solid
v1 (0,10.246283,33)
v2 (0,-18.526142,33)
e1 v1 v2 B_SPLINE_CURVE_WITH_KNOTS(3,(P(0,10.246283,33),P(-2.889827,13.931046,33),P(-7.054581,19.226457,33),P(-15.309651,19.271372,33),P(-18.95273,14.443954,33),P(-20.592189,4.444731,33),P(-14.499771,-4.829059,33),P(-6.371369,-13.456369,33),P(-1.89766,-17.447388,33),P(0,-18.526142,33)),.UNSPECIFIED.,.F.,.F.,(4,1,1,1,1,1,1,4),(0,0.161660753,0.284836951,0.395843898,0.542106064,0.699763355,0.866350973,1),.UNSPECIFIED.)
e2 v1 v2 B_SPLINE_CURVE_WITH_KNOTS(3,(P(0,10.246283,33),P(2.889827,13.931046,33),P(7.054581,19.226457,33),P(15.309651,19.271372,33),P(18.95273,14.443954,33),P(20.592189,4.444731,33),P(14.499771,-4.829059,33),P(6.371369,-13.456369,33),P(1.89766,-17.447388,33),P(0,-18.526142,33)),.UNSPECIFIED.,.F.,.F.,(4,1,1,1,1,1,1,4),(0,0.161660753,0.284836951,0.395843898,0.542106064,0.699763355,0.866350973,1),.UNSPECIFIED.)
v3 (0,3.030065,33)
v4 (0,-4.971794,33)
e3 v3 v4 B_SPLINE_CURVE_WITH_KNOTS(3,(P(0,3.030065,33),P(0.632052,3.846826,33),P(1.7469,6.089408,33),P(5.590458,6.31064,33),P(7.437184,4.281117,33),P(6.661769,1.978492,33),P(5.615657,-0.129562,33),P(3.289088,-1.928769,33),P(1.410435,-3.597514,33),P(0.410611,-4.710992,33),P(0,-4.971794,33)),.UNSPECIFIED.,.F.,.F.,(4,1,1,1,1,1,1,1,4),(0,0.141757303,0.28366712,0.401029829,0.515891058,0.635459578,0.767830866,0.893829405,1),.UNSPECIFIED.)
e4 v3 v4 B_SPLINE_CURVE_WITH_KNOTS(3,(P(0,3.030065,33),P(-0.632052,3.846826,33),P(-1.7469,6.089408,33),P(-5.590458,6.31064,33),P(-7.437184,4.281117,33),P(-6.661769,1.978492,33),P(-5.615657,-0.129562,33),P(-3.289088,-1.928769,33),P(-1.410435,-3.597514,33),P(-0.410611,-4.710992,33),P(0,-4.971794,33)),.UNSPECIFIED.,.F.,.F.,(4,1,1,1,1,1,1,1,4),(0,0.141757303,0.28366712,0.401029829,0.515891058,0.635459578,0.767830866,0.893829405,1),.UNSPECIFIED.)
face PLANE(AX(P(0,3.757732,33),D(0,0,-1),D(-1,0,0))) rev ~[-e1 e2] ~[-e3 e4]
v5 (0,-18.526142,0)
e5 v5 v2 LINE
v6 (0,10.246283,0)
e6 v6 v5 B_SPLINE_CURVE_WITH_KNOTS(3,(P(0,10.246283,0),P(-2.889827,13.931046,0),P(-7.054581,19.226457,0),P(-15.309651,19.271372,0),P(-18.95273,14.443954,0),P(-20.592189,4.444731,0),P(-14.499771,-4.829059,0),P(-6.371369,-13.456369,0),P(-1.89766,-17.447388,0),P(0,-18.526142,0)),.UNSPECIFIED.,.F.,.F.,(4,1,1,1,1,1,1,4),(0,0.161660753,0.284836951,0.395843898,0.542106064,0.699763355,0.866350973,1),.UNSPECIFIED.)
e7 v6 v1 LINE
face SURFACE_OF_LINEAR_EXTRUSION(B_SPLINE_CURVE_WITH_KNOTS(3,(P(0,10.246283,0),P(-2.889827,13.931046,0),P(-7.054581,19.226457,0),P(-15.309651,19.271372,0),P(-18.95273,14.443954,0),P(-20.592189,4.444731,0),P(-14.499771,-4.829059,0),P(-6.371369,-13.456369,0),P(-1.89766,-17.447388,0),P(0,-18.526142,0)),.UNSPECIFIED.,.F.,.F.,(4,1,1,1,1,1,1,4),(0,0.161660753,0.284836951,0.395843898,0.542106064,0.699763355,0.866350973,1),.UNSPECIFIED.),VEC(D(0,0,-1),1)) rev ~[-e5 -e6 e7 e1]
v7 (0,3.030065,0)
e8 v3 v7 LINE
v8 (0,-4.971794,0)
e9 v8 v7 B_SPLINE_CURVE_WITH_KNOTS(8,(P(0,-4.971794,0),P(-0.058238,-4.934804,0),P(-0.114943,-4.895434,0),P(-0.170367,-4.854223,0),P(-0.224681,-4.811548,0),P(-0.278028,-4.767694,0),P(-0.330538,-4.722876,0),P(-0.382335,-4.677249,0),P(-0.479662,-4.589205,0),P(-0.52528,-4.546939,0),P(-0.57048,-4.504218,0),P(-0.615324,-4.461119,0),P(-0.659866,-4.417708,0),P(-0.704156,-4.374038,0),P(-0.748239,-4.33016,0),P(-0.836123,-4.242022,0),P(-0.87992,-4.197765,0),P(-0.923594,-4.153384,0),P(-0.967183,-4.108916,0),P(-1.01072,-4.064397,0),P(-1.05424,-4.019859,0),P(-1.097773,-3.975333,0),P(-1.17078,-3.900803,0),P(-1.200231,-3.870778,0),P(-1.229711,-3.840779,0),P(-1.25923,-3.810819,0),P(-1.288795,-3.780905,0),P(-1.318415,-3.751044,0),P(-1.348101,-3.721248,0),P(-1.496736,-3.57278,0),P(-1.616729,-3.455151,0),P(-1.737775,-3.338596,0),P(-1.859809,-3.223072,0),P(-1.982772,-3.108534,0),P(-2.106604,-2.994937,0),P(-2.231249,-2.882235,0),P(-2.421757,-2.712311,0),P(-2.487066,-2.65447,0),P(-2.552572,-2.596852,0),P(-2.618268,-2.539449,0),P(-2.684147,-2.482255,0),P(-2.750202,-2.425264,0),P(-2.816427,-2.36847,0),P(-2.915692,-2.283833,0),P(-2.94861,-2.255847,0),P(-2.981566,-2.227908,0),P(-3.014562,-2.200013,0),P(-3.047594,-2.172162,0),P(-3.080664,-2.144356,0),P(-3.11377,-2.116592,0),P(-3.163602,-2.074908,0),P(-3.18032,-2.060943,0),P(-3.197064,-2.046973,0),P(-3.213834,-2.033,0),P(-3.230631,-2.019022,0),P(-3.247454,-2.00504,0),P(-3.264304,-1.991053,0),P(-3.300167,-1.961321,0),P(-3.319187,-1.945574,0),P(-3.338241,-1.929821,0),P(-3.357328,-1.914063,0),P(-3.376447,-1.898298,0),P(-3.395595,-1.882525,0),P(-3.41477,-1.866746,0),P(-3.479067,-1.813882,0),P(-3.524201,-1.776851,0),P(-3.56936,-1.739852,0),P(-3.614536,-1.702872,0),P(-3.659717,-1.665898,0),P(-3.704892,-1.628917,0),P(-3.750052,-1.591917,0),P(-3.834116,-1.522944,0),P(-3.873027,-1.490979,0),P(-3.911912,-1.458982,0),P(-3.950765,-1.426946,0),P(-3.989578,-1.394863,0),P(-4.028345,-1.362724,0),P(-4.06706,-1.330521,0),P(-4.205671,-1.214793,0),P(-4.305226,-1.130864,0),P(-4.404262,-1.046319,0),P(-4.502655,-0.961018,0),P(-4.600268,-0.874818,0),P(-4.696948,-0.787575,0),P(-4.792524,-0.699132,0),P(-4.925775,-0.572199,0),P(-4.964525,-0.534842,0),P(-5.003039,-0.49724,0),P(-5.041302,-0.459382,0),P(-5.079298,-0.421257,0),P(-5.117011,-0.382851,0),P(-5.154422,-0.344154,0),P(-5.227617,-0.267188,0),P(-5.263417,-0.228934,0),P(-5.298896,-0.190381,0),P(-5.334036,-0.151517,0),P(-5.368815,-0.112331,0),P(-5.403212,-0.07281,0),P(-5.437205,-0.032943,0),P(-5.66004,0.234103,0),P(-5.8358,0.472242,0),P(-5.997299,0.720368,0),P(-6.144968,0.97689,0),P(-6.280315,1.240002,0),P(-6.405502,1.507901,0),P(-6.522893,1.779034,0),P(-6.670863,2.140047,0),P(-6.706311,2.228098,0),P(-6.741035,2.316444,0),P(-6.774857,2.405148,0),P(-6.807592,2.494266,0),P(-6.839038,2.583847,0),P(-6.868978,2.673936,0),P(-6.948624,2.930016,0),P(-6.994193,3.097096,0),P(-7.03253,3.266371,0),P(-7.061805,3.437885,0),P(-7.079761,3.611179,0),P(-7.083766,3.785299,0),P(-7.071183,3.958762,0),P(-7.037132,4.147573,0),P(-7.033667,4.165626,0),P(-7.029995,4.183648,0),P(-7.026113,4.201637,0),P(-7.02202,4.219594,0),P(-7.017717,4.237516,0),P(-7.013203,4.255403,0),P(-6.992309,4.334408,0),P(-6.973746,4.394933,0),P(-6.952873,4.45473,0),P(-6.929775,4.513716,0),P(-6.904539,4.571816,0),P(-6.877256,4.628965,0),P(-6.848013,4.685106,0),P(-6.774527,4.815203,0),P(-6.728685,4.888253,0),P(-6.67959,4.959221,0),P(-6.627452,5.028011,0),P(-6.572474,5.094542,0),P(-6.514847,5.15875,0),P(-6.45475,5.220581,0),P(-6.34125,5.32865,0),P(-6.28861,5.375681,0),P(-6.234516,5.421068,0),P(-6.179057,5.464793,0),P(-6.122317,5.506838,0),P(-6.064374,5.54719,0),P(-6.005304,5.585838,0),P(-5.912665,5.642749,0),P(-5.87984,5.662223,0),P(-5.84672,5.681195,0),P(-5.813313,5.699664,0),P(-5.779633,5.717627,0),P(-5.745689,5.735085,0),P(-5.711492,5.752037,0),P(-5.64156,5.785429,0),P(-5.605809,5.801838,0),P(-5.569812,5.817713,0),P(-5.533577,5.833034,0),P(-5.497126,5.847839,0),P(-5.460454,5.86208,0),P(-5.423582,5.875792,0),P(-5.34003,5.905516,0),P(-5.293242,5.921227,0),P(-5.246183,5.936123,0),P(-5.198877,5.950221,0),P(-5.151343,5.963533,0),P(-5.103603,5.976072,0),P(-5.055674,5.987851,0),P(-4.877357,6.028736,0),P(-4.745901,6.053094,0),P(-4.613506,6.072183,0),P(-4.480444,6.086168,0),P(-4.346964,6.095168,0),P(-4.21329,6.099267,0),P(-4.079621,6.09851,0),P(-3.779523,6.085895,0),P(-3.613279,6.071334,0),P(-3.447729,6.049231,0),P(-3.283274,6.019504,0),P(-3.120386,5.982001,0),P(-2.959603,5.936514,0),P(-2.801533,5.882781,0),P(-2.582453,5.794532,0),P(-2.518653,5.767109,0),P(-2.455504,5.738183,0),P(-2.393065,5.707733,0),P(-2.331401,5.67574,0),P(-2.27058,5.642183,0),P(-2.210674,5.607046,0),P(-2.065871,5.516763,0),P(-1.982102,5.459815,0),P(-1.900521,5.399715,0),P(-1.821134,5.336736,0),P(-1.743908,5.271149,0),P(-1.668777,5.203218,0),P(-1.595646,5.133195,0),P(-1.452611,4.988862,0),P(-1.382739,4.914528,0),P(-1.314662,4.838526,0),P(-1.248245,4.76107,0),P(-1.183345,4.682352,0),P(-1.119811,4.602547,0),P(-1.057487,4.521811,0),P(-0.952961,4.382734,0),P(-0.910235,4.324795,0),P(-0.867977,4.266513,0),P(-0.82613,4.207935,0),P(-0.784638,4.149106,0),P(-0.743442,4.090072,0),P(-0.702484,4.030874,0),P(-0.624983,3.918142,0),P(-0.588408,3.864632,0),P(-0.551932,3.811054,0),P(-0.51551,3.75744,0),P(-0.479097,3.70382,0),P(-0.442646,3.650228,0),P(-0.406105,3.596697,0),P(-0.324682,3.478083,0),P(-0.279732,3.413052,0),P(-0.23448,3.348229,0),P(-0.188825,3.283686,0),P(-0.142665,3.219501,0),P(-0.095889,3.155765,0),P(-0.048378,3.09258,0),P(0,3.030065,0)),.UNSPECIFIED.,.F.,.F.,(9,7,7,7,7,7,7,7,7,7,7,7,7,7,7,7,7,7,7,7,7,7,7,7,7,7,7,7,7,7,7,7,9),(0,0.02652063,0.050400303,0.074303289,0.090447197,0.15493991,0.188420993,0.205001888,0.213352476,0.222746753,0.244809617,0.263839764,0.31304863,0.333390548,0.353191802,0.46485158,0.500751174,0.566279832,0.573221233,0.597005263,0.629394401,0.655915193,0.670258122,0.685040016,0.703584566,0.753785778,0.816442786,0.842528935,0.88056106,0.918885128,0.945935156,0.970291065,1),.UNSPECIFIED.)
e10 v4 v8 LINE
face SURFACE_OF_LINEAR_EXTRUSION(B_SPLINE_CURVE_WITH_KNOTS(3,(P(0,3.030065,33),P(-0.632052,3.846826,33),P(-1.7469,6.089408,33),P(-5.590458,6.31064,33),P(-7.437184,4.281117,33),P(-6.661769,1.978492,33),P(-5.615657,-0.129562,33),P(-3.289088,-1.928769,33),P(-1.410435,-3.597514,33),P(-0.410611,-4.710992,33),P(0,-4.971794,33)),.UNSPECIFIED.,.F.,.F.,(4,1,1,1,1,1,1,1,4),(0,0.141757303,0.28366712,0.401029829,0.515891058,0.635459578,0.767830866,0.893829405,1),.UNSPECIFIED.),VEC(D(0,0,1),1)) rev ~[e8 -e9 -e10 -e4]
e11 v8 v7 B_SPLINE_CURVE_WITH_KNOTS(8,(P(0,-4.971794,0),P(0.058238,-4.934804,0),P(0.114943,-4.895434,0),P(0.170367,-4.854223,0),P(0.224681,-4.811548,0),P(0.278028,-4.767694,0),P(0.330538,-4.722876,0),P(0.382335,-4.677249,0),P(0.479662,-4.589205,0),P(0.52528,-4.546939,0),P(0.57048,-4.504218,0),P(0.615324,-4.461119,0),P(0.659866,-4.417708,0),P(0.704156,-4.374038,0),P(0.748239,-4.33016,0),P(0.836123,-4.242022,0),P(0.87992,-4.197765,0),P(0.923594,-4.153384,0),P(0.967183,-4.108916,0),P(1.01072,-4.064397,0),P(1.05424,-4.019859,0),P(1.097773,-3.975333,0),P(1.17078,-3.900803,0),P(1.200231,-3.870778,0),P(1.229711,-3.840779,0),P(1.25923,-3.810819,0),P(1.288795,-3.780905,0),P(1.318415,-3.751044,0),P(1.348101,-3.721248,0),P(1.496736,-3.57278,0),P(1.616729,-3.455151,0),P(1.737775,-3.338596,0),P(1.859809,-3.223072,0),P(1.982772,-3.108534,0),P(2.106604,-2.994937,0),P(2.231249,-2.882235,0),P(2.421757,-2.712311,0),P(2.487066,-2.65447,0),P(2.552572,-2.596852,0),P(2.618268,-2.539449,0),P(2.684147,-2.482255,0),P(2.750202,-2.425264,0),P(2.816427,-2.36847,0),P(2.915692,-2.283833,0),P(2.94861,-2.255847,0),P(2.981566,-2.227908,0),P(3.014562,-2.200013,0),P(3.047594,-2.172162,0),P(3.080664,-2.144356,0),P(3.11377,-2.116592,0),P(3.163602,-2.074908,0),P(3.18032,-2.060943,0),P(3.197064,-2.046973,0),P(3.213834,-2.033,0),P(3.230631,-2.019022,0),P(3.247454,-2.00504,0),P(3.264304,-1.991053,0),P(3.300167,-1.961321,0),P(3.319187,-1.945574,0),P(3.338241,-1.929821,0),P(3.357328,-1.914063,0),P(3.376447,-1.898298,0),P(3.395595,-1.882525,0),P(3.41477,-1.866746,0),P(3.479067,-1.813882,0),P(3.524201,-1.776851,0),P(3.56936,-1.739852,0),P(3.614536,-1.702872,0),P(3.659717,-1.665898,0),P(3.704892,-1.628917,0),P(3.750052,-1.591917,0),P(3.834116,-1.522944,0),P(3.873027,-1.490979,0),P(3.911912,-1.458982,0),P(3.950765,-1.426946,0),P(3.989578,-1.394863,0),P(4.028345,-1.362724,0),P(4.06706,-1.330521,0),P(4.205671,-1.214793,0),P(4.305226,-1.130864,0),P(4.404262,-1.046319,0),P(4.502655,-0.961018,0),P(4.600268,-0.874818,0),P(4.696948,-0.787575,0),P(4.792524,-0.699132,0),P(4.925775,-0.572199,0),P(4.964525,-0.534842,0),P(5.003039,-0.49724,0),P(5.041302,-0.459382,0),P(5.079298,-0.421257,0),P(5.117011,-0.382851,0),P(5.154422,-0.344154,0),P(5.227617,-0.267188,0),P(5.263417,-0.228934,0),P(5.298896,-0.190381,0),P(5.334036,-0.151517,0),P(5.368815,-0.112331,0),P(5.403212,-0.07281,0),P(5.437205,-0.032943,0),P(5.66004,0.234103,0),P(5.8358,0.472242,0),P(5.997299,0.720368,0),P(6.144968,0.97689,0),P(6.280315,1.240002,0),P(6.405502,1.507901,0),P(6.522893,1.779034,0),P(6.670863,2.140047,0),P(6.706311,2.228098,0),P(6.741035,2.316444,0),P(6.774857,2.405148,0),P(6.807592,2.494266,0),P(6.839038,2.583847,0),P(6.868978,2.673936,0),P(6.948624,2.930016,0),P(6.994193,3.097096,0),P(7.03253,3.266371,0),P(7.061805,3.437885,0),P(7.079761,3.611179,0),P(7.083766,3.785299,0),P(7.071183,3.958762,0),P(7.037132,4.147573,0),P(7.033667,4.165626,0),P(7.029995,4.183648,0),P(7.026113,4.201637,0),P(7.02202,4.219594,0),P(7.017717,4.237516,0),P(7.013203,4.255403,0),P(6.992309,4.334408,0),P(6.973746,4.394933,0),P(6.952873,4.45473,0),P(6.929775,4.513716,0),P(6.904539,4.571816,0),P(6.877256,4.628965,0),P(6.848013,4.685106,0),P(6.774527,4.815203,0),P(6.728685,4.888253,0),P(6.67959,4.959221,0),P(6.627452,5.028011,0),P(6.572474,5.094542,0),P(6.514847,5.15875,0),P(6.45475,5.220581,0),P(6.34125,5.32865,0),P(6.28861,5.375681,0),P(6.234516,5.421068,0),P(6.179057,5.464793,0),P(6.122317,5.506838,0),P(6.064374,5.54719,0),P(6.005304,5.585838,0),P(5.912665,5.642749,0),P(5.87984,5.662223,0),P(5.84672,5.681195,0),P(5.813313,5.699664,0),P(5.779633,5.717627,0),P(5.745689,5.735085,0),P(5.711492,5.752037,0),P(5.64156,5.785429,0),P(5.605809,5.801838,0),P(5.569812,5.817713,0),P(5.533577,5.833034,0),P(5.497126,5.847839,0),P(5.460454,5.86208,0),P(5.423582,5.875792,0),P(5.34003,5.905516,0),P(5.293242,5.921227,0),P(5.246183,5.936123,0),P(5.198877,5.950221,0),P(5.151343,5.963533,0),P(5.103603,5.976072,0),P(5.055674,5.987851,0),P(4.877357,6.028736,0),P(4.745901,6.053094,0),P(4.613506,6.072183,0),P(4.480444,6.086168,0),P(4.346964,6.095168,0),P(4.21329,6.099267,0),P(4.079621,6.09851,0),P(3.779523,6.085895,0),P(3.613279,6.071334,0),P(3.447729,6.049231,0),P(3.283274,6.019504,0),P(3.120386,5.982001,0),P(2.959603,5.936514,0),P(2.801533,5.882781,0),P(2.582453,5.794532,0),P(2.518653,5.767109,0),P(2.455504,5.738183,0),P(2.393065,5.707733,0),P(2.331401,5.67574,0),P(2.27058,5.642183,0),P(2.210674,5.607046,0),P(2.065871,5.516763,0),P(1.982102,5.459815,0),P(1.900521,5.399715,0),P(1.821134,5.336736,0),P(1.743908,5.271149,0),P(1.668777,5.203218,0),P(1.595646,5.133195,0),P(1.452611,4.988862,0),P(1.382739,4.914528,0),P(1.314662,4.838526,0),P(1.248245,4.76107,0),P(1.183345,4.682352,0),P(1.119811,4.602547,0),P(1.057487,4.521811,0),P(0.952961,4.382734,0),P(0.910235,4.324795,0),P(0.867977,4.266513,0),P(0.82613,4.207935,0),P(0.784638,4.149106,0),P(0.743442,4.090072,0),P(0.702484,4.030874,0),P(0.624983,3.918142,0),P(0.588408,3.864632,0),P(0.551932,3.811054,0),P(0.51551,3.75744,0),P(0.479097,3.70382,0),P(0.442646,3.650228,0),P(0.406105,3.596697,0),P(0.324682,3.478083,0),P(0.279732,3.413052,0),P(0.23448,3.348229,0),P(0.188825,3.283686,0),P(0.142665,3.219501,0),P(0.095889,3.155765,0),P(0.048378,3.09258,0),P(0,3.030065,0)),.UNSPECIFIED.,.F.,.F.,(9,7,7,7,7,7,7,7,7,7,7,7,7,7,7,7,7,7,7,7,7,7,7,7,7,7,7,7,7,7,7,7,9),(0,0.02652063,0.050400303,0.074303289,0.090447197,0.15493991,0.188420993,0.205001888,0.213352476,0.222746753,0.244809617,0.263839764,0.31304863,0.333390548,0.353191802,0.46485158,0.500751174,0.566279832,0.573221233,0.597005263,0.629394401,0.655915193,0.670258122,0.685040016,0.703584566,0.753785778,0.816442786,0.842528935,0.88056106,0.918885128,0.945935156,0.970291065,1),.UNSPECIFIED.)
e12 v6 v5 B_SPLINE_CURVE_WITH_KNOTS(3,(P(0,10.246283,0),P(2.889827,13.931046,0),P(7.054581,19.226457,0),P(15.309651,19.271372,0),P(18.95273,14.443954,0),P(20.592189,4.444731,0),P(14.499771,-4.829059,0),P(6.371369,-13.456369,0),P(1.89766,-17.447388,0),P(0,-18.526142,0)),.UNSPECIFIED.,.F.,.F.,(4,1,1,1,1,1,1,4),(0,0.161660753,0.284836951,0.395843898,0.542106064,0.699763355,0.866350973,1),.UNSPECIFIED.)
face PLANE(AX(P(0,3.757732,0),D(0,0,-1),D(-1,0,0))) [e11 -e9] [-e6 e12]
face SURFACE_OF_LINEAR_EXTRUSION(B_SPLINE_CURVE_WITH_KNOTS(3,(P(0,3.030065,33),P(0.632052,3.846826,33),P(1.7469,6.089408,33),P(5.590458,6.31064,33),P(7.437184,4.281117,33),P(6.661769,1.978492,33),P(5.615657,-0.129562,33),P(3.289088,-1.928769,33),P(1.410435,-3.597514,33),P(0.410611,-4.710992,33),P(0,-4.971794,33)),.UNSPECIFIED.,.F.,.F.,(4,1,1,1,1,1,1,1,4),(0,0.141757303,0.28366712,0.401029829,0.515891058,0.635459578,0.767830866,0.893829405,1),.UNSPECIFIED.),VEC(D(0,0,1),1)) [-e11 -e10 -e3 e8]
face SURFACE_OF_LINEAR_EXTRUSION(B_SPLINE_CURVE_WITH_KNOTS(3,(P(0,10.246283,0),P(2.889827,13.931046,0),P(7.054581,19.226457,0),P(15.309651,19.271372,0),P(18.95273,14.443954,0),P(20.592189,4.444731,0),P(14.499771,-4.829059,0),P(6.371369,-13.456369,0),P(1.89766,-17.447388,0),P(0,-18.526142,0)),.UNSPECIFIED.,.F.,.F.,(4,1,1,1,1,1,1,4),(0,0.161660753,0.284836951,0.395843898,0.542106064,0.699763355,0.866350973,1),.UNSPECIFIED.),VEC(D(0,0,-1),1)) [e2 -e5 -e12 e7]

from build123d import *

# Parameters (mm, degrees)
F1_DEPTH = 33
F4_DEPTH = 76.9


# Not quite as in the source:
# - a feature names something its author has since deleted; it is built from what else it names


with BuildPart() as f1:
    # F0 (on Top) → F1 (new body)
    with BuildSketch(Plane.XY):
        with BuildLine():
            add(Edge.make_bspline(
                [(0, 10.2462833747), (2.8898270042, 13.9310457571), (7.0545812906, 19.2264572436), (15.3096506032, 19.2713715697), (18.952729902, 14.4439536567), (20.5921894779, 4.4447308225), (14.4997714791, -4.8290589443), (6.3713687355, -13.4563685464), (1.8976598298, -17.4473877844), (0, -18.5261424631)],
                knots=[0, 0, 0, 0, 0.161660753, 0.284836951, 0.395843898, 0.5421060645, 0.6997633553, 0.8663509734, 1, 1, 1, 1], degree=3))
            add(Edge.make_bspline(
                [(0, 10.2462833747), (-2.8898270042, 13.9310457571), (-7.0545812906, 19.2264572436), (-15.3096506032, 19.2713715697), (-18.952729902, 14.4439536567), (-20.5921894779, 4.4447308225), (-14.4997714791, -4.8290589443), (-6.3713687355, -13.4563685464), (-1.8976598298, -17.4473877844), (0, -18.5261424631)],
                knots=[0, 0, 0, 0, 0.161660753, 0.284836951, 0.395843898, 0.5421060645, 0.6997633553, 0.8663509734, 1, 1, 1, 1], degree=3))
        make_face()
    extrude(amount=F1_DEPTH)

    # F3 (on face) → F4 (cut)
    with BuildSketch(Plane.XY.offset(33)):
        with BuildLine():
            add(Edge.make_bspline(
                [(0, 3.0300645158), (0.6320519945, 3.8468260259), (1.7469002241, 6.0894075449), (5.5904577014, 6.3106402141), (7.4371838117, 4.2811169904), (6.6617686825, 1.9784920014), (5.6156573866, -0.1295622595), (3.2890882774, -1.9287685451), (1.4104347086, -3.5975135002), (0.4106112506, -4.7109916764), (0, -4.9717943184)],
                knots=[0, 0, 0, 0, 0.1417573032, 0.2836671205, 0.4010298291, 0.5158910582, 0.6354595782, 0.7678308655, 0.8938294053, 1, 1, 1, 1], degree=3))
            add(Edge.make_bspline(
                [(0, 3.0300645158), (-0.6320519945, 3.8468260259), (-1.7469002241, 6.0894075449), (-5.5904577014, 6.3106402141), (-7.4371838117, 4.2811169904), (-6.6617686825, 1.9784920014), (-5.6156573866, -0.1295622595), (-3.2890882774, -1.9287685451), (-1.4104347086, -3.5975135002), (-0.4106112506, -4.7109916764), (0, -4.9717943184)],
                knots=[0, 0, 0, 0, 0.1417573032, 0.2836671205, 0.4010298291, 0.5158910582, 0.6354595782, 0.7678308655, 0.8938294053, 1, 1, 1, 1], degree=3))
        make_face()
    extrude(amount=-F4_DEPTH, mode=Mode.SUBTRACT)


solid = f1.part
